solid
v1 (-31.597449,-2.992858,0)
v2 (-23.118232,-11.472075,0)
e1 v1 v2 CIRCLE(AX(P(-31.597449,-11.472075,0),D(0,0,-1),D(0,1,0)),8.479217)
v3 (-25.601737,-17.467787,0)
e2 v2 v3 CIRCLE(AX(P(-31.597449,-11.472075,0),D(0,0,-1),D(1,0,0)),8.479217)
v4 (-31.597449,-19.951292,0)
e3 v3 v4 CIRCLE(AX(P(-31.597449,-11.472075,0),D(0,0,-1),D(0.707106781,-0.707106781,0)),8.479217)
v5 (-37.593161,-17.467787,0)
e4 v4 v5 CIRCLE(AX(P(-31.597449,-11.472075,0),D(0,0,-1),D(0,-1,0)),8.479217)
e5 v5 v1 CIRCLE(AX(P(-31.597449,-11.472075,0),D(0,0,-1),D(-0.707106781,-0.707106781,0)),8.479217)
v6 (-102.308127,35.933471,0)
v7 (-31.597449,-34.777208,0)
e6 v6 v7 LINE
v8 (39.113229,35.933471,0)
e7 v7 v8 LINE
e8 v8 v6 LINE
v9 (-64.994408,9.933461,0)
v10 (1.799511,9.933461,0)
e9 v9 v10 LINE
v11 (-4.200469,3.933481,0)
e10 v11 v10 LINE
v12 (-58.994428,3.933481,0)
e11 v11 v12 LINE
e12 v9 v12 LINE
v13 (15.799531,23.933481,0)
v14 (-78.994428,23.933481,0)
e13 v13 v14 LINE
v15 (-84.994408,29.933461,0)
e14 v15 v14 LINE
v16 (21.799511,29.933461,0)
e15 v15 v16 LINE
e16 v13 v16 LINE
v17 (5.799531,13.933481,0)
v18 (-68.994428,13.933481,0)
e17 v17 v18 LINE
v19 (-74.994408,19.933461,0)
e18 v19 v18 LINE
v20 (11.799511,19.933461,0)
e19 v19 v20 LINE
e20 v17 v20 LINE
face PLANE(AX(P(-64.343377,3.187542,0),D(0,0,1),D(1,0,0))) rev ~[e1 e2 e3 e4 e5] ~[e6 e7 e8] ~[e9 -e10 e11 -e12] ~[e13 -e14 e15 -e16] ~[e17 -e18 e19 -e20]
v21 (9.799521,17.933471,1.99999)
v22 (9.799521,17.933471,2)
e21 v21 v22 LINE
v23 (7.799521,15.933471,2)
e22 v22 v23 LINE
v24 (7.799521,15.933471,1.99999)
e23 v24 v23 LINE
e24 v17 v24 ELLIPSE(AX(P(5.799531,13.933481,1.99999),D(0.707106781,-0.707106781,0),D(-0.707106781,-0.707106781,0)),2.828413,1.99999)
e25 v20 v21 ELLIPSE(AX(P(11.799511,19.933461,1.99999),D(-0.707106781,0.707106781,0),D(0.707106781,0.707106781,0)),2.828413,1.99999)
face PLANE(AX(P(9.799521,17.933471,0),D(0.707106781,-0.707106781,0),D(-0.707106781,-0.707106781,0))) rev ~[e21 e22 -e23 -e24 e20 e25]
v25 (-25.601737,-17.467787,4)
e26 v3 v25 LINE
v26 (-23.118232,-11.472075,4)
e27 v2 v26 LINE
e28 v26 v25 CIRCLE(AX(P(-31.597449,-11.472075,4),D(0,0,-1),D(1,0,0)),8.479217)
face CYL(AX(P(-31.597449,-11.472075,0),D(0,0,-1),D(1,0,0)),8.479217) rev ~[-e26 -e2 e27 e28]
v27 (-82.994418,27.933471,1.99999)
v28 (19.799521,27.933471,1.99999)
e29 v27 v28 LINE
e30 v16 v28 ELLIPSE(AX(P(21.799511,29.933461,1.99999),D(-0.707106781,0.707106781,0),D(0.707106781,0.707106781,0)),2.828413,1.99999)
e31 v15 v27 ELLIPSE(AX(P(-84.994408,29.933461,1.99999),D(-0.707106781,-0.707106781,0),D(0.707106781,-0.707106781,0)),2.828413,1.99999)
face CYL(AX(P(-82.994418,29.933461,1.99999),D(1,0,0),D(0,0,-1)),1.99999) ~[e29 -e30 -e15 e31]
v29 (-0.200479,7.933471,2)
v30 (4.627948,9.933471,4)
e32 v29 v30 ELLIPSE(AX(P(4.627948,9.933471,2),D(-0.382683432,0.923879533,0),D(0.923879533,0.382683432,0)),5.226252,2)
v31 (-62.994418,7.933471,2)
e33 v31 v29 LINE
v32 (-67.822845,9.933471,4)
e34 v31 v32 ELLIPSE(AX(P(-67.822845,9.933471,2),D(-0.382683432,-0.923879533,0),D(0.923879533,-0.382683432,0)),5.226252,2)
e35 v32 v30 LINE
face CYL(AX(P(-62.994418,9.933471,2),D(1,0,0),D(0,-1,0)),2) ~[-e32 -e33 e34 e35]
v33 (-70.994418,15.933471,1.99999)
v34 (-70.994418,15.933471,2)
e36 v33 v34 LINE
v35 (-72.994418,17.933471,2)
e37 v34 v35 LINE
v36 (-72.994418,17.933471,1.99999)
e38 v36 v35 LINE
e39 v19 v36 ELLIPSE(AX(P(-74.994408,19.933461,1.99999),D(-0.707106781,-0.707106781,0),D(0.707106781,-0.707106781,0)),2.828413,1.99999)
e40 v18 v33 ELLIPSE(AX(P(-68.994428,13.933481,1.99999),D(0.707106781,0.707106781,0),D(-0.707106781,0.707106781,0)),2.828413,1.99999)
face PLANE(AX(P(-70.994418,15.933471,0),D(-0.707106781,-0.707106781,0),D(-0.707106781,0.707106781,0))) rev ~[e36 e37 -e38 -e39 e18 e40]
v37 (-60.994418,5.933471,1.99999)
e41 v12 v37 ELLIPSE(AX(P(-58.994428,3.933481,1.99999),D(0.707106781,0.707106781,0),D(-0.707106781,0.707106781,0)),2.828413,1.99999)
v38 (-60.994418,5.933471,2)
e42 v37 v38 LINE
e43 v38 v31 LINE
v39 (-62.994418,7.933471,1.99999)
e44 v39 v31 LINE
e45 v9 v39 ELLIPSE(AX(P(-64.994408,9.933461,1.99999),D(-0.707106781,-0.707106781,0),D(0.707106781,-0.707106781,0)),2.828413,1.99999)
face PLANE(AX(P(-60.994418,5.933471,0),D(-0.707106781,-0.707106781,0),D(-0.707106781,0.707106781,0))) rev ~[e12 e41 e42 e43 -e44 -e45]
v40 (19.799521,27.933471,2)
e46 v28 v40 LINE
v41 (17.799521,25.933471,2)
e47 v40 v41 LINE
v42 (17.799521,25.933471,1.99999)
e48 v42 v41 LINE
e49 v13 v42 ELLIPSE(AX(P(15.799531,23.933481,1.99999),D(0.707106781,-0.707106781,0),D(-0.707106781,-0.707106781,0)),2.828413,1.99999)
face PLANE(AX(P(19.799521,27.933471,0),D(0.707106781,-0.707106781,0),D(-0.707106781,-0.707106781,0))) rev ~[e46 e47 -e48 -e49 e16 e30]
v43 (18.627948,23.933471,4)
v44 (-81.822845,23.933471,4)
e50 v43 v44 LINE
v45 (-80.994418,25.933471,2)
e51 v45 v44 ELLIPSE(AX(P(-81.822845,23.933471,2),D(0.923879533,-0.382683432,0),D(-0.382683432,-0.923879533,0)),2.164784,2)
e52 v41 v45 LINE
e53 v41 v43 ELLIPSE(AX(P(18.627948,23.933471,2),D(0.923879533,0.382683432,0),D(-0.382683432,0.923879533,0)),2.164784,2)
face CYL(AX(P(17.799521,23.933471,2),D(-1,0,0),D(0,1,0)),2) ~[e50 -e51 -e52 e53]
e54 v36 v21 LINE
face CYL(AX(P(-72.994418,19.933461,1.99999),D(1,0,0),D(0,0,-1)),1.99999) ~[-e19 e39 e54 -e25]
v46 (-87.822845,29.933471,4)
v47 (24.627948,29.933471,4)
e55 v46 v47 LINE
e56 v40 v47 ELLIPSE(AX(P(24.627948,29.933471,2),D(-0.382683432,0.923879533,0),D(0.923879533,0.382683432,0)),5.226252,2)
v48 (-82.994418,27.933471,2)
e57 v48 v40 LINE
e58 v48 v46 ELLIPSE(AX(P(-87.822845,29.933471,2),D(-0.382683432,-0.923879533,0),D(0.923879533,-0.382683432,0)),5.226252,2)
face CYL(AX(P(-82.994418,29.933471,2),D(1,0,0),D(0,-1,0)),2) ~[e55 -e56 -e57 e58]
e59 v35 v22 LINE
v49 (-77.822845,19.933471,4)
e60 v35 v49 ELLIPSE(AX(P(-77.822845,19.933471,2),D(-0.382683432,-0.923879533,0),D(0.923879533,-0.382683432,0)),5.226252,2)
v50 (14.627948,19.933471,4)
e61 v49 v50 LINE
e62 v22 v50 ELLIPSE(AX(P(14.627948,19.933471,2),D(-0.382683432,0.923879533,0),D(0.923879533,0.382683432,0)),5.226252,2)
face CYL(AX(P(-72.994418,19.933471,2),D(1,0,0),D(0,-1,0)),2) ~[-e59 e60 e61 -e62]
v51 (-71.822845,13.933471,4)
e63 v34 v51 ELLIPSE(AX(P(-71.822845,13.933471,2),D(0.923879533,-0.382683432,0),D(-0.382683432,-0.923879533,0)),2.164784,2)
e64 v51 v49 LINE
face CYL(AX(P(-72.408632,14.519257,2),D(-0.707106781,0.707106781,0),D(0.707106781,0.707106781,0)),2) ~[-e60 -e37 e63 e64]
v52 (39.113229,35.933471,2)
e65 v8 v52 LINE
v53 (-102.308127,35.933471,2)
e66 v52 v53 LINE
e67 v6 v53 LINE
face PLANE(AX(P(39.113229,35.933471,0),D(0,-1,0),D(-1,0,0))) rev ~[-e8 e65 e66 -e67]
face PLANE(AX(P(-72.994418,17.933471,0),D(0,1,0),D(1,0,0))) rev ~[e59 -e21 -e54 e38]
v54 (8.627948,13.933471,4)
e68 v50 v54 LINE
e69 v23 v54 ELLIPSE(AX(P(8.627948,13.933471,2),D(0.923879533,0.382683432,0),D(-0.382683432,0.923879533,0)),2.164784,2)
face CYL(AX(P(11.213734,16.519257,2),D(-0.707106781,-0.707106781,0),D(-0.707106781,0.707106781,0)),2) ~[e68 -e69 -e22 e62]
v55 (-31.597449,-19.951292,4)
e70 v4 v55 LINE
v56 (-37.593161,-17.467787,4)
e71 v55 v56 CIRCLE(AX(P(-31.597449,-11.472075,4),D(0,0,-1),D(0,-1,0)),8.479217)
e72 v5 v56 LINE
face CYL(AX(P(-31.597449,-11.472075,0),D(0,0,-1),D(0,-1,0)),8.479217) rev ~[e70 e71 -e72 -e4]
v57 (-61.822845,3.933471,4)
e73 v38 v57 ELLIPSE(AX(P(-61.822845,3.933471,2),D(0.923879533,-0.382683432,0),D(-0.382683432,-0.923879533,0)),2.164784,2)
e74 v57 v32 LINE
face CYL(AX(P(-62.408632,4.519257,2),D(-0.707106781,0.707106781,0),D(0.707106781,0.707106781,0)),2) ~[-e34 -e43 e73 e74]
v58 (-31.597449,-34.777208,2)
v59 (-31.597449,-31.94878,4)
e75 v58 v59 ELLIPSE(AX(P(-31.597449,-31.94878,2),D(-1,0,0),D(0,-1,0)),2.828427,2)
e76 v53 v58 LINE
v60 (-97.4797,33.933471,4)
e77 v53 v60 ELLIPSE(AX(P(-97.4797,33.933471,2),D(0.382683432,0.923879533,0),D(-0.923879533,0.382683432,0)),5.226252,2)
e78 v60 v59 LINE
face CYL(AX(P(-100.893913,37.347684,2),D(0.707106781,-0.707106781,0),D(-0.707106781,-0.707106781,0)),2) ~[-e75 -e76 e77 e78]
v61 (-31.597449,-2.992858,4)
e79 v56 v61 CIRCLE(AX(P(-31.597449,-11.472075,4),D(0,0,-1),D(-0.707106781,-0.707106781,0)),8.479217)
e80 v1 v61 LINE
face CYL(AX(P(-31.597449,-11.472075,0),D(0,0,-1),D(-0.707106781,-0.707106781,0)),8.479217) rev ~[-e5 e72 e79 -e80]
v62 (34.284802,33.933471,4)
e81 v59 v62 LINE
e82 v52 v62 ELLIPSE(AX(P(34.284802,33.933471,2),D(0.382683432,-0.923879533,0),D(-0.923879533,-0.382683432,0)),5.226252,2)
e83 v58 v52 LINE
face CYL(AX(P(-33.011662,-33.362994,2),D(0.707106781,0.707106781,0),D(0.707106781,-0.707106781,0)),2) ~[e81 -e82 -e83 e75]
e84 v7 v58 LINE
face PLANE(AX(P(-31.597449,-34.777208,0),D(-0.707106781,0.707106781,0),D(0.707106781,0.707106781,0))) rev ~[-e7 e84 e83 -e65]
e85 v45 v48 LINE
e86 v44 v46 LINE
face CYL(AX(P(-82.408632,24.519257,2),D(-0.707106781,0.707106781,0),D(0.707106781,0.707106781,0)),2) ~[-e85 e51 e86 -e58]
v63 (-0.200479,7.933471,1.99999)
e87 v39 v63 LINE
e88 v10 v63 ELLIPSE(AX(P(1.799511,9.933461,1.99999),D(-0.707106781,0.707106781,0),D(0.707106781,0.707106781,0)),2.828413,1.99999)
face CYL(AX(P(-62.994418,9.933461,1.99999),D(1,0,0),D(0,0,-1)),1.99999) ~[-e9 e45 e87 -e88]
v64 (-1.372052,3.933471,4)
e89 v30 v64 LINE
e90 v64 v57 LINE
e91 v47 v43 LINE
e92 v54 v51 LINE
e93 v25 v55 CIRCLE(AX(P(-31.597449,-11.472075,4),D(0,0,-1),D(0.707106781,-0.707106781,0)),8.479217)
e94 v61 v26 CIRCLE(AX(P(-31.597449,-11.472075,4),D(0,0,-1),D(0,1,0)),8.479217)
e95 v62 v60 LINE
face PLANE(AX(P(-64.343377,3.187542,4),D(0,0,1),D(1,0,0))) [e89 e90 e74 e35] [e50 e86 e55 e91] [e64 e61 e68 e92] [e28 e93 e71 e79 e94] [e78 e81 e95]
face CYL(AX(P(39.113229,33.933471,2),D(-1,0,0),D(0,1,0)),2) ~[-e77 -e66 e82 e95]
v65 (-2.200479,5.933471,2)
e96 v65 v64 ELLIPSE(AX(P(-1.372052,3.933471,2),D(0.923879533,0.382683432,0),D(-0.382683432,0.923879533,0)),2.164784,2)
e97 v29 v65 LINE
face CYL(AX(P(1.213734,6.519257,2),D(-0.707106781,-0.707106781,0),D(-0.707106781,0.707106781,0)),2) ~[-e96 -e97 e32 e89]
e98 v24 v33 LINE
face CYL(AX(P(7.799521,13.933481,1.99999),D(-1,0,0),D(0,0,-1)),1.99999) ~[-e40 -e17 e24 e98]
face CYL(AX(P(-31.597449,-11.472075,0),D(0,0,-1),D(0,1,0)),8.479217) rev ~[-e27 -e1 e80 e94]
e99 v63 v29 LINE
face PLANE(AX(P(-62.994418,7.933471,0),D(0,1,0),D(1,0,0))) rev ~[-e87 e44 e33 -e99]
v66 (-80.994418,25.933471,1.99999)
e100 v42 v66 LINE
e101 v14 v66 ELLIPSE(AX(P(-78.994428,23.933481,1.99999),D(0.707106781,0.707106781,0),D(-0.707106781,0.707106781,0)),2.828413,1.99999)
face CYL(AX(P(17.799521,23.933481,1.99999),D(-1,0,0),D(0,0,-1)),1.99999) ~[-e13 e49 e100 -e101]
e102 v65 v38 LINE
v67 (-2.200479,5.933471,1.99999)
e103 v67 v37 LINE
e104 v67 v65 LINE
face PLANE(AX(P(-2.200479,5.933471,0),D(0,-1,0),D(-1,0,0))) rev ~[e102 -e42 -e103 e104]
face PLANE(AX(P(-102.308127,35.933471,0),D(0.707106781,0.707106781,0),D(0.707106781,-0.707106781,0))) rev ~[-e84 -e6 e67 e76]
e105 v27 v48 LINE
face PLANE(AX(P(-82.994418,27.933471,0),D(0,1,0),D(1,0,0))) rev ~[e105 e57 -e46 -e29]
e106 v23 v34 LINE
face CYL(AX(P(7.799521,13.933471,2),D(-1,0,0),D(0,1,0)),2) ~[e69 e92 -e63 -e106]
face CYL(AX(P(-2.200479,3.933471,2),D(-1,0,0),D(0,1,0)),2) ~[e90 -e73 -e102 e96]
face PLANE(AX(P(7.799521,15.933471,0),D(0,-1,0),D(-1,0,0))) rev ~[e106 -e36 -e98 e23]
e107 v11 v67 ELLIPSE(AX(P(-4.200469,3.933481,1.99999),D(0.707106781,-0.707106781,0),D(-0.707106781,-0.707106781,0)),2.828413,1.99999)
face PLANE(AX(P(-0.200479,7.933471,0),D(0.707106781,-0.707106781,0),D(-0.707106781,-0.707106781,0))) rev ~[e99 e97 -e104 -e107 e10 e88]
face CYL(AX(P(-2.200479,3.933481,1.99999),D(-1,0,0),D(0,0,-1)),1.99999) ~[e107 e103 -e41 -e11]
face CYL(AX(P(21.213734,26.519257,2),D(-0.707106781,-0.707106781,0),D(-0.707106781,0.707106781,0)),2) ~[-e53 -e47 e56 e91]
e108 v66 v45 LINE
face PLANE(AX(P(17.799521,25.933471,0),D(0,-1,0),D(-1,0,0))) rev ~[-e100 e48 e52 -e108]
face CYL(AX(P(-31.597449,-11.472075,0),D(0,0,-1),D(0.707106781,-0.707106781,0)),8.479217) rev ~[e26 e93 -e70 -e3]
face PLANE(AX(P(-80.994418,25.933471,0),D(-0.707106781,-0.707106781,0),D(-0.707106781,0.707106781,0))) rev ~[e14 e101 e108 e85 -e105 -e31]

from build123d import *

# Parameters (mm, degrees)
F1_DEPTH = 4
F2_R     = 2
F3_R     = 1.99999


# Not quite as in the source:
# - a fillet or chamfer is up to 0.001 mm smaller than in the source, because OpenCascade refuses the exact size


with BuildPart() as f1:
    # F0 (on Top) → F1 (new body)
    with BuildSketch(Plane.XY):
        Polygon((-82.9944183651, 27.933470586), (-90.9944183651, 35.933470586), (-102.3081268641, 35.933470586), (-31.5974487455, -34.7772075326), (-31.5974487455, -23.4634990336), (-37.5931606391, -17.46778714), (-60.9944183651, 5.933470586), (-62.9944183651, 7.933470586), (-70.9944183651, 15.933470586), (-72.9944183651, 17.933470586), (-80.9944183651, 25.933470586), align=None)
        with BuildLine():
            Line((-60.9944183651, 5.933470586), (-37.5931606391, -17.46778714))
            ThreePointArc((-37.5931606391, -17.46778714), (-39.4312238538, -8.2272193518), (-31.5974487455, -2.9928581702))
            Line((-31.5974487455, -2.9928581702), (-31.5974487455, 5.933470586))
            Line((-31.5974487455, 5.933470586), (-60.9944183651, 5.933470586))
        make_face()
        with BuildLine():
            Line((-31.5974487455, -19.9512923224), (-31.5974487455, -23.4634990336))
            Line((-31.5974487455, -23.4634990336), (-25.6017368518, -17.46778714))
            ThreePointArc((-25.6017368518, -17.46778714), (-28.352592851, -19.3058503546), (-31.5974487455, -19.9512923224))
        make_face()
        Polygon((39.1132293732, 35.933470586), (27.7995208742, 35.933470586), (19.7995208742, 27.933470586), (17.7995208742, 25.933470586), (9.7995208742, 17.933470586), (7.7995208742, 15.933470586), (-0.2004791258, 7.933470586), (-2.2004791258, 5.933470586), (-25.6017368518, -17.46778714), (-31.5974487455, -23.4634990336), (-31.5974487455, -34.7772075326), align=None)
        with BuildLine():
            Line((-37.5931606391, -17.46778714), (-31.5974487455, -23.4634990336))
            Line((-31.5974487455, -23.4634990336), (-31.5974487455, -19.9512923224))
            ThreePointArc((-31.5974487455, -19.9512923224), (-34.8423046399, -19.3058503546), (-37.5931606391, -17.46778714))
        make_face()
        with BuildLine():
            ThreePointArc((-23.1182316693, -11.4720752463), (-23.7636736371, -14.7169311407), (-25.6017368518, -17.46778714))
            Line((-25.6017368518, -17.46778714), (-2.2004791258, 5.933470586))
            Line((-2.2004791258, 5.933470586), (-31.5974487455, 5.933470586))
            Line((-31.5974487455, 5.933470586), (-31.5974487455, -2.9928581702))
            ThreePointArc((-31.5974487455, -2.9928581702), (-25.6017368518, -5.4763633526), (-23.1182316693, -11.4720752463))
        make_face()
        Polygon((7.7995208742, 15.933470586), (-31.5974487455, 15.933470586), (-31.5974487455, 7.933470586), (-0.2004791258, 7.933470586), align=None)
        Polygon((-31.5974487455, 7.933470586), (-31.5974487455, 15.933470586), (-70.9944183651, 15.933470586), (-62.9944183651, 7.933470586), align=None)
        Polygon((17.7995208742, 25.933470586), (-31.5974487455, 25.933470586), (-31.5974487455, 17.933470586), (9.7995208742, 17.933470586), align=None)
        Polygon((-31.5974487455, 17.933470586), (-31.5974487455, 25.933470586), (-80.9944183651, 25.933470586), (-72.9944183651, 17.933470586), align=None)
        Polygon((27.7995208742, 35.933470586), (-31.5974487455, 35.933470586), (-31.5974487455, 27.933470586), (19.7995208742, 27.933470586), align=None)
        Polygon((-31.5974487455, 27.933470586), (-31.5974487455, 35.933470586), (-90.9944183651, 35.933470586), (-82.9944183651, 27.933470586), align=None)
    extrude(amount=F1_DEPTH)

    # F2
    f2_edges = [f1.edges().sort_by_distance(p)[0] for p in [
        (-31.597449, 35.933471, 4),
        (-31.597449, 27.933471, 4),
        (-31.597449, 25.933471, 4),
        (-31.597449, 17.933471, 4),
        (-31.597449, 15.933471, 4),
        (-31.597449, 7.933471, 4),
        (-31.597449, 5.933471, 4),
        (-66.952788, 0.578132, 4),
        (3.75789, 0.578132, 4),
        (8.799521, 16.933471, 4),
        (18.799521, 26.933471, 4),
        (-1.200479, 6.933471, 4),
        (-61.994418, 6.933471, 4),
        (-71.994418, 16.933471, 4),
        (-81.994418, 26.933471, 4),
    ]]
    fillet(f2_edges, radius=F2_R)

    # F3 (radius 2 in the source; OpenCascade refuses exactly that, so slightly less here)
    f3_edges = [f1.edges().sort_by_distance(p)[0] for p in [
        (-31.597449, 27.933471, 0),
        (-31.597449, 25.933471, 0),
        (-31.597449, 7.933471, 0),
        (-31.597449, 5.933471, 0),
        (-31.597449, 17.933471, 0),
        (-31.597449, 15.933471, 0),
    ]]
    fillet(f3_edges, radius=F3_R)


solid = f1.part
